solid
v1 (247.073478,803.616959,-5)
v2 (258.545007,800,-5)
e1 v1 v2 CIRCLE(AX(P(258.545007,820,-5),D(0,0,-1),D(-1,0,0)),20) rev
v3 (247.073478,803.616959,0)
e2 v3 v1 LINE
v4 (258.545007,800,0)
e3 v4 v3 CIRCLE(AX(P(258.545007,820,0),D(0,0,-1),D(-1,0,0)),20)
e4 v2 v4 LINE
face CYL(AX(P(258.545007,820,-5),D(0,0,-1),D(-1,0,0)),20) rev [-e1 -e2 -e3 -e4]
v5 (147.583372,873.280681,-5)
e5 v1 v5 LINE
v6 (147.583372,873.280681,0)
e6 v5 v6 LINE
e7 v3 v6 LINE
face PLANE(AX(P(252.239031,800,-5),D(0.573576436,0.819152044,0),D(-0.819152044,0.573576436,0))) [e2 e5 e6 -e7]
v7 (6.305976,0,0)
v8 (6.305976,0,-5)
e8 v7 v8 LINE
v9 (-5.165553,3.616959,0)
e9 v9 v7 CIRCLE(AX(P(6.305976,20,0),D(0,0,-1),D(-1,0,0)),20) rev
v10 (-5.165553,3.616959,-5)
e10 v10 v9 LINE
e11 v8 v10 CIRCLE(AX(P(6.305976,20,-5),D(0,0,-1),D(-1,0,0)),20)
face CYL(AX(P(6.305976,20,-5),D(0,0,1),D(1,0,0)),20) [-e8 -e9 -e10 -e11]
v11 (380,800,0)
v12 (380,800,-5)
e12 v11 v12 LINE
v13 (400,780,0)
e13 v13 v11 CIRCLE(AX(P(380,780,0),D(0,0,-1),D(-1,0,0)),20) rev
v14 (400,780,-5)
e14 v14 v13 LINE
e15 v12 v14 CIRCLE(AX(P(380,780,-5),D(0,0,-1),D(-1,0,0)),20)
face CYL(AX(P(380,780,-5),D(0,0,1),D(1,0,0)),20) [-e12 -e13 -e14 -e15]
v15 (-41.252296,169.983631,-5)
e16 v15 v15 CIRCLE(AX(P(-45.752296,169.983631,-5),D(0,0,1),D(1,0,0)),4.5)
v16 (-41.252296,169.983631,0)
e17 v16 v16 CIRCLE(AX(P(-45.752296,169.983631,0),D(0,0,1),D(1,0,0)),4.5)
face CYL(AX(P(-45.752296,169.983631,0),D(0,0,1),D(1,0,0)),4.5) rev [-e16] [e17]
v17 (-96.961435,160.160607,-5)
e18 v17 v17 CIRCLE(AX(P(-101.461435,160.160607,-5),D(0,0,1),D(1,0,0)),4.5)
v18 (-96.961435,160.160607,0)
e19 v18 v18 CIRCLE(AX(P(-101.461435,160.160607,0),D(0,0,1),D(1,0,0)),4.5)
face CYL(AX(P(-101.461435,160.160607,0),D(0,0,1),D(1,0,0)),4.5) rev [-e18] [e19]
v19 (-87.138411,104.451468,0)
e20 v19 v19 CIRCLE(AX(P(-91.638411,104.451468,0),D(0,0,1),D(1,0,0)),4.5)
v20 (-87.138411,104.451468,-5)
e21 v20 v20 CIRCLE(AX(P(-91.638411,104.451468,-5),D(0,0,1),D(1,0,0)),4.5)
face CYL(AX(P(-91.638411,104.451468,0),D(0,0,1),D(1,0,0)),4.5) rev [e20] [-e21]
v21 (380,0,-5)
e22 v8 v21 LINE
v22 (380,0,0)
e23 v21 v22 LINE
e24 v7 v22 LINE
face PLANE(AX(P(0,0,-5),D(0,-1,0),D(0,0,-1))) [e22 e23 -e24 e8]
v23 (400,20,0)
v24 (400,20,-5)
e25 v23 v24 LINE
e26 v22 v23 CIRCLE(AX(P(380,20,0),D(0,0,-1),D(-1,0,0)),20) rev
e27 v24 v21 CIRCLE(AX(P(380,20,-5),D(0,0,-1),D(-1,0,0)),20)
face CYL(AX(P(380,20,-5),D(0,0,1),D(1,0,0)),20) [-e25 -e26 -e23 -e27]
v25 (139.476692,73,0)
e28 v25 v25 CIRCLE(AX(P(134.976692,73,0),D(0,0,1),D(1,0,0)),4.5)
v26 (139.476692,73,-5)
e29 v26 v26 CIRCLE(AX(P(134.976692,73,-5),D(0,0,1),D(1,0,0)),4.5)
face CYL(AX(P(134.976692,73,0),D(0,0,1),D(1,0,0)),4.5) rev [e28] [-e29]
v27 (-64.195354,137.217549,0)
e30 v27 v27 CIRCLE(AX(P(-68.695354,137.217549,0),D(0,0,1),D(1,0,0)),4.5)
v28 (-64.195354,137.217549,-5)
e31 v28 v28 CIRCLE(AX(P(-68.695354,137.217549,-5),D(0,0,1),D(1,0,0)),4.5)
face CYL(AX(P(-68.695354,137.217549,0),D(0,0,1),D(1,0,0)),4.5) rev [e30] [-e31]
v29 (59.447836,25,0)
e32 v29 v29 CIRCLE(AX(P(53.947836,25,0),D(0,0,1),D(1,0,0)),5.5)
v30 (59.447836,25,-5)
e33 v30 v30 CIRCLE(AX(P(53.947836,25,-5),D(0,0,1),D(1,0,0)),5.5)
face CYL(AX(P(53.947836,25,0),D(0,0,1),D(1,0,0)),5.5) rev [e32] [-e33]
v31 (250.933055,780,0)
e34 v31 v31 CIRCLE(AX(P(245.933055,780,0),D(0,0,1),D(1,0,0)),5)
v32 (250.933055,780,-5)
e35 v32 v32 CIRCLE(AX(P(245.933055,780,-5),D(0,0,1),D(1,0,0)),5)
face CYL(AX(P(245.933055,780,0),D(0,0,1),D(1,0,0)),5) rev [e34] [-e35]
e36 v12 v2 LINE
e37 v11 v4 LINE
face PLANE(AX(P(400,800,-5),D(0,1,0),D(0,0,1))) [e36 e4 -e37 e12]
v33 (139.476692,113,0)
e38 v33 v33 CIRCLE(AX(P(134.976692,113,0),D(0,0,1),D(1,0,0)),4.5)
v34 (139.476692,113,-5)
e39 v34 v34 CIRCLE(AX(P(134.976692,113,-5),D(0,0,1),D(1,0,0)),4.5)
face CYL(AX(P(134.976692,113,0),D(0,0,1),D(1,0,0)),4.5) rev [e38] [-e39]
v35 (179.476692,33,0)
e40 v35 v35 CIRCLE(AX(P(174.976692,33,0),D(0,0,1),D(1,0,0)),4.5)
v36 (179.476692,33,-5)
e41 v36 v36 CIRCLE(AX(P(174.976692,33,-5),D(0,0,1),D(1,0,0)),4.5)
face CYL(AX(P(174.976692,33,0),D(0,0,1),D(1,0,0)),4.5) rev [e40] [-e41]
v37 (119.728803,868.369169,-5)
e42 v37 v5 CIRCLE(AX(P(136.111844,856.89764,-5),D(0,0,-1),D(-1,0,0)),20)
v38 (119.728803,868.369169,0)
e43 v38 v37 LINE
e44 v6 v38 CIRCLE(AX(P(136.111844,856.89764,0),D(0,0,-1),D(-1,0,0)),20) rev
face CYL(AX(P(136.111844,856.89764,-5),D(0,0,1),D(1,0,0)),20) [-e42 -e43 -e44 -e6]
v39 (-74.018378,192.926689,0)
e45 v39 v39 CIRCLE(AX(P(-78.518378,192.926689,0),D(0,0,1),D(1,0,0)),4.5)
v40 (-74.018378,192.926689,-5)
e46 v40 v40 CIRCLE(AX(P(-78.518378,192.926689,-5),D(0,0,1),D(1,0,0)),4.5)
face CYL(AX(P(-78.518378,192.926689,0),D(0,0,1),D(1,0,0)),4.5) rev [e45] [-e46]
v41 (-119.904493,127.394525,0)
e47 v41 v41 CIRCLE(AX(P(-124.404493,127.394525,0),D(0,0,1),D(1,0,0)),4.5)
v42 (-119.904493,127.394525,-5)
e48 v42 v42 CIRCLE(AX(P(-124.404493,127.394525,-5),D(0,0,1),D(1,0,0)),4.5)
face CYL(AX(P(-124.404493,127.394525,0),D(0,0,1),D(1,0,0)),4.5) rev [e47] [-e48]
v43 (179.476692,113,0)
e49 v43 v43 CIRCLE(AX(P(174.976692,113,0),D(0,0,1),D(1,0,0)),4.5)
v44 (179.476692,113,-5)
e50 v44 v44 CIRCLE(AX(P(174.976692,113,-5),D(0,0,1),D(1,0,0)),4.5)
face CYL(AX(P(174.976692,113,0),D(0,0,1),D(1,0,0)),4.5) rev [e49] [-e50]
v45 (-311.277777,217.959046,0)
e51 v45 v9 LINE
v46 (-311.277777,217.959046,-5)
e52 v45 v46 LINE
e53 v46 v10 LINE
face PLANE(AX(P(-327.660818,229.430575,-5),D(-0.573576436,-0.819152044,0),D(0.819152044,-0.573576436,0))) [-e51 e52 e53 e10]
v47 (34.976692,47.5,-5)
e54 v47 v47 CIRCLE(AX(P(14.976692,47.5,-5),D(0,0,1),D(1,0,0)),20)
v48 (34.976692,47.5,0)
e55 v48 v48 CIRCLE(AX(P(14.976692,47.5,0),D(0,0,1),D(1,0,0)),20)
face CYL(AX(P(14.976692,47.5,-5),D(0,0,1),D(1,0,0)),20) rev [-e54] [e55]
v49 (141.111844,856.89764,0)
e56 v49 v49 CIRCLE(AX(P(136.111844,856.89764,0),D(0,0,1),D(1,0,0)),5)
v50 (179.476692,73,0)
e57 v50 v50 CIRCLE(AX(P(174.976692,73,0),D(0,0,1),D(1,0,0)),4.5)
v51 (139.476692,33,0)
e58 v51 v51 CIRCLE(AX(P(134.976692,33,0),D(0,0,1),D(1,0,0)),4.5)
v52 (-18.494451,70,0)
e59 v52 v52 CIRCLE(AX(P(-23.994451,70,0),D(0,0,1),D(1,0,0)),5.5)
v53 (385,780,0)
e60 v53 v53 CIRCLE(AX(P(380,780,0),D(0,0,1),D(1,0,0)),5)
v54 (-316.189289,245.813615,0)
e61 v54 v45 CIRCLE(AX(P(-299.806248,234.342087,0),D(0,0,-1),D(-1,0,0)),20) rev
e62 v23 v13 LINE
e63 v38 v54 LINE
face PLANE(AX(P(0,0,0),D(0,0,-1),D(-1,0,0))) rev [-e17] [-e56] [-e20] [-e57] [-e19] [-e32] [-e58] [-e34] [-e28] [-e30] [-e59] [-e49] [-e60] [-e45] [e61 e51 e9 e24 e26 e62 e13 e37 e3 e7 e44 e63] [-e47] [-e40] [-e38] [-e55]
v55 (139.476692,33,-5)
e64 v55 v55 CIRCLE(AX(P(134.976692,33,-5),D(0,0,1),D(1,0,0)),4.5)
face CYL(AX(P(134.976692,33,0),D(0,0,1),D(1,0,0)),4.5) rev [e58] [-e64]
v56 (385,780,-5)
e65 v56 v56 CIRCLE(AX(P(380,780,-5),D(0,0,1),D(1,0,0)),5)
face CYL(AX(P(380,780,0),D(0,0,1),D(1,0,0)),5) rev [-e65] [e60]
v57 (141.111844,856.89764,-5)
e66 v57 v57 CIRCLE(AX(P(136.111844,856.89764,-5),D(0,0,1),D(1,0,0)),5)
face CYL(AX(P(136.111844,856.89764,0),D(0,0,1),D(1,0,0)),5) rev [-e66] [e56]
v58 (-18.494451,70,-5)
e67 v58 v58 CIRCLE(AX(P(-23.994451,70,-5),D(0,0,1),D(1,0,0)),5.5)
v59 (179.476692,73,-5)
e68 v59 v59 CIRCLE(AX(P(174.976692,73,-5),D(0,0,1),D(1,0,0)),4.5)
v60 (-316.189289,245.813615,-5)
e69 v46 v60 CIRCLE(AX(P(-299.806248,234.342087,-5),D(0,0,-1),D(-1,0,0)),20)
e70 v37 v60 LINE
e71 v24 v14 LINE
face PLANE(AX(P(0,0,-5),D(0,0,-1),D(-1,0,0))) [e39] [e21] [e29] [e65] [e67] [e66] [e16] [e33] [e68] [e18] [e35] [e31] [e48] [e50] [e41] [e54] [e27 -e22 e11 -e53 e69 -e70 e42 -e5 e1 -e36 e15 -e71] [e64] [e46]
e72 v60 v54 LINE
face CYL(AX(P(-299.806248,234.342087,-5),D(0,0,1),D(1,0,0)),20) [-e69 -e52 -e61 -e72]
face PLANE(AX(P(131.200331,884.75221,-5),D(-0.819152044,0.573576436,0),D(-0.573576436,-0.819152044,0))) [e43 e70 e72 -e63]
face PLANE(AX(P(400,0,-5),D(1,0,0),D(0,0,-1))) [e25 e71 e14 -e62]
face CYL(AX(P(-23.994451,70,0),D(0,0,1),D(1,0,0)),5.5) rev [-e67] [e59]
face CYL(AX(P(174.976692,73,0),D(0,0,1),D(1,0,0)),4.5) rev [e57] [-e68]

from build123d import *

# Parameters (mm, degrees)
BASE_FLANGE1_DEPTH         = 5
FILLET1_R                  = 20
F_10_0_10_DIAMETER_HOLE1_D = 10
SKETCH10_R                 = 20
CUT_EXTRUDE1_DEPTH         = 964.833217765
M10_CLEARANCE_HOLE3_D      = 11
M8_CLEARANCE_HOLE1_D       = 9


# Sheet-metal steps are written as plain solids
with BuildPart() as part:
    # Sketch1 → Base-Flange1 (new body)
    with BuildSketch(Plane.XY):
        Polygon((0, 0), (400, 0), (400, 800), (252.239031103, 800), (131.200331365, 884.752209972), (-327.660817716, 229.43057454), align=None)
    extrude(amount=-BASE_FLANGE1_DEPTH)

    # Fillet1
    fillet1_edges = [part.edges().sort_by_distance(p)[0] for p in [
        (-327.660817716, 229.43057454, -2.5),
        (131.200331365, 884.752209972, -2.5),
        (252.239031103, 800, -2.5),
        (400, 800, -2.5),
        (400, 0, -2.5),
        (0, 0, -2.5),
    ]]
    fillet(fillet1_edges, radius=FILLET1_R)

    # Ø10.0 (10) Diameter Hole1 (through all)
    with Locations(Plane.XY):
        with Locations((245.933055326, 780), (136.111843524, 856.897640359), (380, 780)):
            Hole(F_10_0_10_DIAMETER_HOLE1_D / 2)

    # Sketch10 → Cut-Extrude1 (cut, through all)
    with BuildSketch(Plane.XY):
        with Locations((14.976692472, 47.5)):
            Circle(SKETCH10_R)
    extrude(amount=-CUT_EXTRUDE1_DEPTH, mode=Mode.SUBTRACT)

    # M10 Clearance Hole3 (through all)
    with Locations(Plane.XY):
        with Locations((-23.994450699, 70), (53.947835642, 25)):
            Hole(M10_CLEARANCE_HOLE3_D / 2)

    # M8 Clearance Hole1 (through all)
    with Locations(Plane.XY):
        with Locations((-124.404492942, 127.394525174), (-78.518378033, 192.926688717), (-45.752296262, 169.983631263), (-91.63841117, 104.45146772), (-101.461435488, 160.160606946), (-68.695353716, 137.217549491), (134.976692472, 113), (174.976692472, 33), (134.976692472, 33), (174.976692472, 113), (134.976692472, 73), (174.976692472, 73)):
            Hole(M8_CLEARANCE_HOLE1_D / 2)


solid = part.part
